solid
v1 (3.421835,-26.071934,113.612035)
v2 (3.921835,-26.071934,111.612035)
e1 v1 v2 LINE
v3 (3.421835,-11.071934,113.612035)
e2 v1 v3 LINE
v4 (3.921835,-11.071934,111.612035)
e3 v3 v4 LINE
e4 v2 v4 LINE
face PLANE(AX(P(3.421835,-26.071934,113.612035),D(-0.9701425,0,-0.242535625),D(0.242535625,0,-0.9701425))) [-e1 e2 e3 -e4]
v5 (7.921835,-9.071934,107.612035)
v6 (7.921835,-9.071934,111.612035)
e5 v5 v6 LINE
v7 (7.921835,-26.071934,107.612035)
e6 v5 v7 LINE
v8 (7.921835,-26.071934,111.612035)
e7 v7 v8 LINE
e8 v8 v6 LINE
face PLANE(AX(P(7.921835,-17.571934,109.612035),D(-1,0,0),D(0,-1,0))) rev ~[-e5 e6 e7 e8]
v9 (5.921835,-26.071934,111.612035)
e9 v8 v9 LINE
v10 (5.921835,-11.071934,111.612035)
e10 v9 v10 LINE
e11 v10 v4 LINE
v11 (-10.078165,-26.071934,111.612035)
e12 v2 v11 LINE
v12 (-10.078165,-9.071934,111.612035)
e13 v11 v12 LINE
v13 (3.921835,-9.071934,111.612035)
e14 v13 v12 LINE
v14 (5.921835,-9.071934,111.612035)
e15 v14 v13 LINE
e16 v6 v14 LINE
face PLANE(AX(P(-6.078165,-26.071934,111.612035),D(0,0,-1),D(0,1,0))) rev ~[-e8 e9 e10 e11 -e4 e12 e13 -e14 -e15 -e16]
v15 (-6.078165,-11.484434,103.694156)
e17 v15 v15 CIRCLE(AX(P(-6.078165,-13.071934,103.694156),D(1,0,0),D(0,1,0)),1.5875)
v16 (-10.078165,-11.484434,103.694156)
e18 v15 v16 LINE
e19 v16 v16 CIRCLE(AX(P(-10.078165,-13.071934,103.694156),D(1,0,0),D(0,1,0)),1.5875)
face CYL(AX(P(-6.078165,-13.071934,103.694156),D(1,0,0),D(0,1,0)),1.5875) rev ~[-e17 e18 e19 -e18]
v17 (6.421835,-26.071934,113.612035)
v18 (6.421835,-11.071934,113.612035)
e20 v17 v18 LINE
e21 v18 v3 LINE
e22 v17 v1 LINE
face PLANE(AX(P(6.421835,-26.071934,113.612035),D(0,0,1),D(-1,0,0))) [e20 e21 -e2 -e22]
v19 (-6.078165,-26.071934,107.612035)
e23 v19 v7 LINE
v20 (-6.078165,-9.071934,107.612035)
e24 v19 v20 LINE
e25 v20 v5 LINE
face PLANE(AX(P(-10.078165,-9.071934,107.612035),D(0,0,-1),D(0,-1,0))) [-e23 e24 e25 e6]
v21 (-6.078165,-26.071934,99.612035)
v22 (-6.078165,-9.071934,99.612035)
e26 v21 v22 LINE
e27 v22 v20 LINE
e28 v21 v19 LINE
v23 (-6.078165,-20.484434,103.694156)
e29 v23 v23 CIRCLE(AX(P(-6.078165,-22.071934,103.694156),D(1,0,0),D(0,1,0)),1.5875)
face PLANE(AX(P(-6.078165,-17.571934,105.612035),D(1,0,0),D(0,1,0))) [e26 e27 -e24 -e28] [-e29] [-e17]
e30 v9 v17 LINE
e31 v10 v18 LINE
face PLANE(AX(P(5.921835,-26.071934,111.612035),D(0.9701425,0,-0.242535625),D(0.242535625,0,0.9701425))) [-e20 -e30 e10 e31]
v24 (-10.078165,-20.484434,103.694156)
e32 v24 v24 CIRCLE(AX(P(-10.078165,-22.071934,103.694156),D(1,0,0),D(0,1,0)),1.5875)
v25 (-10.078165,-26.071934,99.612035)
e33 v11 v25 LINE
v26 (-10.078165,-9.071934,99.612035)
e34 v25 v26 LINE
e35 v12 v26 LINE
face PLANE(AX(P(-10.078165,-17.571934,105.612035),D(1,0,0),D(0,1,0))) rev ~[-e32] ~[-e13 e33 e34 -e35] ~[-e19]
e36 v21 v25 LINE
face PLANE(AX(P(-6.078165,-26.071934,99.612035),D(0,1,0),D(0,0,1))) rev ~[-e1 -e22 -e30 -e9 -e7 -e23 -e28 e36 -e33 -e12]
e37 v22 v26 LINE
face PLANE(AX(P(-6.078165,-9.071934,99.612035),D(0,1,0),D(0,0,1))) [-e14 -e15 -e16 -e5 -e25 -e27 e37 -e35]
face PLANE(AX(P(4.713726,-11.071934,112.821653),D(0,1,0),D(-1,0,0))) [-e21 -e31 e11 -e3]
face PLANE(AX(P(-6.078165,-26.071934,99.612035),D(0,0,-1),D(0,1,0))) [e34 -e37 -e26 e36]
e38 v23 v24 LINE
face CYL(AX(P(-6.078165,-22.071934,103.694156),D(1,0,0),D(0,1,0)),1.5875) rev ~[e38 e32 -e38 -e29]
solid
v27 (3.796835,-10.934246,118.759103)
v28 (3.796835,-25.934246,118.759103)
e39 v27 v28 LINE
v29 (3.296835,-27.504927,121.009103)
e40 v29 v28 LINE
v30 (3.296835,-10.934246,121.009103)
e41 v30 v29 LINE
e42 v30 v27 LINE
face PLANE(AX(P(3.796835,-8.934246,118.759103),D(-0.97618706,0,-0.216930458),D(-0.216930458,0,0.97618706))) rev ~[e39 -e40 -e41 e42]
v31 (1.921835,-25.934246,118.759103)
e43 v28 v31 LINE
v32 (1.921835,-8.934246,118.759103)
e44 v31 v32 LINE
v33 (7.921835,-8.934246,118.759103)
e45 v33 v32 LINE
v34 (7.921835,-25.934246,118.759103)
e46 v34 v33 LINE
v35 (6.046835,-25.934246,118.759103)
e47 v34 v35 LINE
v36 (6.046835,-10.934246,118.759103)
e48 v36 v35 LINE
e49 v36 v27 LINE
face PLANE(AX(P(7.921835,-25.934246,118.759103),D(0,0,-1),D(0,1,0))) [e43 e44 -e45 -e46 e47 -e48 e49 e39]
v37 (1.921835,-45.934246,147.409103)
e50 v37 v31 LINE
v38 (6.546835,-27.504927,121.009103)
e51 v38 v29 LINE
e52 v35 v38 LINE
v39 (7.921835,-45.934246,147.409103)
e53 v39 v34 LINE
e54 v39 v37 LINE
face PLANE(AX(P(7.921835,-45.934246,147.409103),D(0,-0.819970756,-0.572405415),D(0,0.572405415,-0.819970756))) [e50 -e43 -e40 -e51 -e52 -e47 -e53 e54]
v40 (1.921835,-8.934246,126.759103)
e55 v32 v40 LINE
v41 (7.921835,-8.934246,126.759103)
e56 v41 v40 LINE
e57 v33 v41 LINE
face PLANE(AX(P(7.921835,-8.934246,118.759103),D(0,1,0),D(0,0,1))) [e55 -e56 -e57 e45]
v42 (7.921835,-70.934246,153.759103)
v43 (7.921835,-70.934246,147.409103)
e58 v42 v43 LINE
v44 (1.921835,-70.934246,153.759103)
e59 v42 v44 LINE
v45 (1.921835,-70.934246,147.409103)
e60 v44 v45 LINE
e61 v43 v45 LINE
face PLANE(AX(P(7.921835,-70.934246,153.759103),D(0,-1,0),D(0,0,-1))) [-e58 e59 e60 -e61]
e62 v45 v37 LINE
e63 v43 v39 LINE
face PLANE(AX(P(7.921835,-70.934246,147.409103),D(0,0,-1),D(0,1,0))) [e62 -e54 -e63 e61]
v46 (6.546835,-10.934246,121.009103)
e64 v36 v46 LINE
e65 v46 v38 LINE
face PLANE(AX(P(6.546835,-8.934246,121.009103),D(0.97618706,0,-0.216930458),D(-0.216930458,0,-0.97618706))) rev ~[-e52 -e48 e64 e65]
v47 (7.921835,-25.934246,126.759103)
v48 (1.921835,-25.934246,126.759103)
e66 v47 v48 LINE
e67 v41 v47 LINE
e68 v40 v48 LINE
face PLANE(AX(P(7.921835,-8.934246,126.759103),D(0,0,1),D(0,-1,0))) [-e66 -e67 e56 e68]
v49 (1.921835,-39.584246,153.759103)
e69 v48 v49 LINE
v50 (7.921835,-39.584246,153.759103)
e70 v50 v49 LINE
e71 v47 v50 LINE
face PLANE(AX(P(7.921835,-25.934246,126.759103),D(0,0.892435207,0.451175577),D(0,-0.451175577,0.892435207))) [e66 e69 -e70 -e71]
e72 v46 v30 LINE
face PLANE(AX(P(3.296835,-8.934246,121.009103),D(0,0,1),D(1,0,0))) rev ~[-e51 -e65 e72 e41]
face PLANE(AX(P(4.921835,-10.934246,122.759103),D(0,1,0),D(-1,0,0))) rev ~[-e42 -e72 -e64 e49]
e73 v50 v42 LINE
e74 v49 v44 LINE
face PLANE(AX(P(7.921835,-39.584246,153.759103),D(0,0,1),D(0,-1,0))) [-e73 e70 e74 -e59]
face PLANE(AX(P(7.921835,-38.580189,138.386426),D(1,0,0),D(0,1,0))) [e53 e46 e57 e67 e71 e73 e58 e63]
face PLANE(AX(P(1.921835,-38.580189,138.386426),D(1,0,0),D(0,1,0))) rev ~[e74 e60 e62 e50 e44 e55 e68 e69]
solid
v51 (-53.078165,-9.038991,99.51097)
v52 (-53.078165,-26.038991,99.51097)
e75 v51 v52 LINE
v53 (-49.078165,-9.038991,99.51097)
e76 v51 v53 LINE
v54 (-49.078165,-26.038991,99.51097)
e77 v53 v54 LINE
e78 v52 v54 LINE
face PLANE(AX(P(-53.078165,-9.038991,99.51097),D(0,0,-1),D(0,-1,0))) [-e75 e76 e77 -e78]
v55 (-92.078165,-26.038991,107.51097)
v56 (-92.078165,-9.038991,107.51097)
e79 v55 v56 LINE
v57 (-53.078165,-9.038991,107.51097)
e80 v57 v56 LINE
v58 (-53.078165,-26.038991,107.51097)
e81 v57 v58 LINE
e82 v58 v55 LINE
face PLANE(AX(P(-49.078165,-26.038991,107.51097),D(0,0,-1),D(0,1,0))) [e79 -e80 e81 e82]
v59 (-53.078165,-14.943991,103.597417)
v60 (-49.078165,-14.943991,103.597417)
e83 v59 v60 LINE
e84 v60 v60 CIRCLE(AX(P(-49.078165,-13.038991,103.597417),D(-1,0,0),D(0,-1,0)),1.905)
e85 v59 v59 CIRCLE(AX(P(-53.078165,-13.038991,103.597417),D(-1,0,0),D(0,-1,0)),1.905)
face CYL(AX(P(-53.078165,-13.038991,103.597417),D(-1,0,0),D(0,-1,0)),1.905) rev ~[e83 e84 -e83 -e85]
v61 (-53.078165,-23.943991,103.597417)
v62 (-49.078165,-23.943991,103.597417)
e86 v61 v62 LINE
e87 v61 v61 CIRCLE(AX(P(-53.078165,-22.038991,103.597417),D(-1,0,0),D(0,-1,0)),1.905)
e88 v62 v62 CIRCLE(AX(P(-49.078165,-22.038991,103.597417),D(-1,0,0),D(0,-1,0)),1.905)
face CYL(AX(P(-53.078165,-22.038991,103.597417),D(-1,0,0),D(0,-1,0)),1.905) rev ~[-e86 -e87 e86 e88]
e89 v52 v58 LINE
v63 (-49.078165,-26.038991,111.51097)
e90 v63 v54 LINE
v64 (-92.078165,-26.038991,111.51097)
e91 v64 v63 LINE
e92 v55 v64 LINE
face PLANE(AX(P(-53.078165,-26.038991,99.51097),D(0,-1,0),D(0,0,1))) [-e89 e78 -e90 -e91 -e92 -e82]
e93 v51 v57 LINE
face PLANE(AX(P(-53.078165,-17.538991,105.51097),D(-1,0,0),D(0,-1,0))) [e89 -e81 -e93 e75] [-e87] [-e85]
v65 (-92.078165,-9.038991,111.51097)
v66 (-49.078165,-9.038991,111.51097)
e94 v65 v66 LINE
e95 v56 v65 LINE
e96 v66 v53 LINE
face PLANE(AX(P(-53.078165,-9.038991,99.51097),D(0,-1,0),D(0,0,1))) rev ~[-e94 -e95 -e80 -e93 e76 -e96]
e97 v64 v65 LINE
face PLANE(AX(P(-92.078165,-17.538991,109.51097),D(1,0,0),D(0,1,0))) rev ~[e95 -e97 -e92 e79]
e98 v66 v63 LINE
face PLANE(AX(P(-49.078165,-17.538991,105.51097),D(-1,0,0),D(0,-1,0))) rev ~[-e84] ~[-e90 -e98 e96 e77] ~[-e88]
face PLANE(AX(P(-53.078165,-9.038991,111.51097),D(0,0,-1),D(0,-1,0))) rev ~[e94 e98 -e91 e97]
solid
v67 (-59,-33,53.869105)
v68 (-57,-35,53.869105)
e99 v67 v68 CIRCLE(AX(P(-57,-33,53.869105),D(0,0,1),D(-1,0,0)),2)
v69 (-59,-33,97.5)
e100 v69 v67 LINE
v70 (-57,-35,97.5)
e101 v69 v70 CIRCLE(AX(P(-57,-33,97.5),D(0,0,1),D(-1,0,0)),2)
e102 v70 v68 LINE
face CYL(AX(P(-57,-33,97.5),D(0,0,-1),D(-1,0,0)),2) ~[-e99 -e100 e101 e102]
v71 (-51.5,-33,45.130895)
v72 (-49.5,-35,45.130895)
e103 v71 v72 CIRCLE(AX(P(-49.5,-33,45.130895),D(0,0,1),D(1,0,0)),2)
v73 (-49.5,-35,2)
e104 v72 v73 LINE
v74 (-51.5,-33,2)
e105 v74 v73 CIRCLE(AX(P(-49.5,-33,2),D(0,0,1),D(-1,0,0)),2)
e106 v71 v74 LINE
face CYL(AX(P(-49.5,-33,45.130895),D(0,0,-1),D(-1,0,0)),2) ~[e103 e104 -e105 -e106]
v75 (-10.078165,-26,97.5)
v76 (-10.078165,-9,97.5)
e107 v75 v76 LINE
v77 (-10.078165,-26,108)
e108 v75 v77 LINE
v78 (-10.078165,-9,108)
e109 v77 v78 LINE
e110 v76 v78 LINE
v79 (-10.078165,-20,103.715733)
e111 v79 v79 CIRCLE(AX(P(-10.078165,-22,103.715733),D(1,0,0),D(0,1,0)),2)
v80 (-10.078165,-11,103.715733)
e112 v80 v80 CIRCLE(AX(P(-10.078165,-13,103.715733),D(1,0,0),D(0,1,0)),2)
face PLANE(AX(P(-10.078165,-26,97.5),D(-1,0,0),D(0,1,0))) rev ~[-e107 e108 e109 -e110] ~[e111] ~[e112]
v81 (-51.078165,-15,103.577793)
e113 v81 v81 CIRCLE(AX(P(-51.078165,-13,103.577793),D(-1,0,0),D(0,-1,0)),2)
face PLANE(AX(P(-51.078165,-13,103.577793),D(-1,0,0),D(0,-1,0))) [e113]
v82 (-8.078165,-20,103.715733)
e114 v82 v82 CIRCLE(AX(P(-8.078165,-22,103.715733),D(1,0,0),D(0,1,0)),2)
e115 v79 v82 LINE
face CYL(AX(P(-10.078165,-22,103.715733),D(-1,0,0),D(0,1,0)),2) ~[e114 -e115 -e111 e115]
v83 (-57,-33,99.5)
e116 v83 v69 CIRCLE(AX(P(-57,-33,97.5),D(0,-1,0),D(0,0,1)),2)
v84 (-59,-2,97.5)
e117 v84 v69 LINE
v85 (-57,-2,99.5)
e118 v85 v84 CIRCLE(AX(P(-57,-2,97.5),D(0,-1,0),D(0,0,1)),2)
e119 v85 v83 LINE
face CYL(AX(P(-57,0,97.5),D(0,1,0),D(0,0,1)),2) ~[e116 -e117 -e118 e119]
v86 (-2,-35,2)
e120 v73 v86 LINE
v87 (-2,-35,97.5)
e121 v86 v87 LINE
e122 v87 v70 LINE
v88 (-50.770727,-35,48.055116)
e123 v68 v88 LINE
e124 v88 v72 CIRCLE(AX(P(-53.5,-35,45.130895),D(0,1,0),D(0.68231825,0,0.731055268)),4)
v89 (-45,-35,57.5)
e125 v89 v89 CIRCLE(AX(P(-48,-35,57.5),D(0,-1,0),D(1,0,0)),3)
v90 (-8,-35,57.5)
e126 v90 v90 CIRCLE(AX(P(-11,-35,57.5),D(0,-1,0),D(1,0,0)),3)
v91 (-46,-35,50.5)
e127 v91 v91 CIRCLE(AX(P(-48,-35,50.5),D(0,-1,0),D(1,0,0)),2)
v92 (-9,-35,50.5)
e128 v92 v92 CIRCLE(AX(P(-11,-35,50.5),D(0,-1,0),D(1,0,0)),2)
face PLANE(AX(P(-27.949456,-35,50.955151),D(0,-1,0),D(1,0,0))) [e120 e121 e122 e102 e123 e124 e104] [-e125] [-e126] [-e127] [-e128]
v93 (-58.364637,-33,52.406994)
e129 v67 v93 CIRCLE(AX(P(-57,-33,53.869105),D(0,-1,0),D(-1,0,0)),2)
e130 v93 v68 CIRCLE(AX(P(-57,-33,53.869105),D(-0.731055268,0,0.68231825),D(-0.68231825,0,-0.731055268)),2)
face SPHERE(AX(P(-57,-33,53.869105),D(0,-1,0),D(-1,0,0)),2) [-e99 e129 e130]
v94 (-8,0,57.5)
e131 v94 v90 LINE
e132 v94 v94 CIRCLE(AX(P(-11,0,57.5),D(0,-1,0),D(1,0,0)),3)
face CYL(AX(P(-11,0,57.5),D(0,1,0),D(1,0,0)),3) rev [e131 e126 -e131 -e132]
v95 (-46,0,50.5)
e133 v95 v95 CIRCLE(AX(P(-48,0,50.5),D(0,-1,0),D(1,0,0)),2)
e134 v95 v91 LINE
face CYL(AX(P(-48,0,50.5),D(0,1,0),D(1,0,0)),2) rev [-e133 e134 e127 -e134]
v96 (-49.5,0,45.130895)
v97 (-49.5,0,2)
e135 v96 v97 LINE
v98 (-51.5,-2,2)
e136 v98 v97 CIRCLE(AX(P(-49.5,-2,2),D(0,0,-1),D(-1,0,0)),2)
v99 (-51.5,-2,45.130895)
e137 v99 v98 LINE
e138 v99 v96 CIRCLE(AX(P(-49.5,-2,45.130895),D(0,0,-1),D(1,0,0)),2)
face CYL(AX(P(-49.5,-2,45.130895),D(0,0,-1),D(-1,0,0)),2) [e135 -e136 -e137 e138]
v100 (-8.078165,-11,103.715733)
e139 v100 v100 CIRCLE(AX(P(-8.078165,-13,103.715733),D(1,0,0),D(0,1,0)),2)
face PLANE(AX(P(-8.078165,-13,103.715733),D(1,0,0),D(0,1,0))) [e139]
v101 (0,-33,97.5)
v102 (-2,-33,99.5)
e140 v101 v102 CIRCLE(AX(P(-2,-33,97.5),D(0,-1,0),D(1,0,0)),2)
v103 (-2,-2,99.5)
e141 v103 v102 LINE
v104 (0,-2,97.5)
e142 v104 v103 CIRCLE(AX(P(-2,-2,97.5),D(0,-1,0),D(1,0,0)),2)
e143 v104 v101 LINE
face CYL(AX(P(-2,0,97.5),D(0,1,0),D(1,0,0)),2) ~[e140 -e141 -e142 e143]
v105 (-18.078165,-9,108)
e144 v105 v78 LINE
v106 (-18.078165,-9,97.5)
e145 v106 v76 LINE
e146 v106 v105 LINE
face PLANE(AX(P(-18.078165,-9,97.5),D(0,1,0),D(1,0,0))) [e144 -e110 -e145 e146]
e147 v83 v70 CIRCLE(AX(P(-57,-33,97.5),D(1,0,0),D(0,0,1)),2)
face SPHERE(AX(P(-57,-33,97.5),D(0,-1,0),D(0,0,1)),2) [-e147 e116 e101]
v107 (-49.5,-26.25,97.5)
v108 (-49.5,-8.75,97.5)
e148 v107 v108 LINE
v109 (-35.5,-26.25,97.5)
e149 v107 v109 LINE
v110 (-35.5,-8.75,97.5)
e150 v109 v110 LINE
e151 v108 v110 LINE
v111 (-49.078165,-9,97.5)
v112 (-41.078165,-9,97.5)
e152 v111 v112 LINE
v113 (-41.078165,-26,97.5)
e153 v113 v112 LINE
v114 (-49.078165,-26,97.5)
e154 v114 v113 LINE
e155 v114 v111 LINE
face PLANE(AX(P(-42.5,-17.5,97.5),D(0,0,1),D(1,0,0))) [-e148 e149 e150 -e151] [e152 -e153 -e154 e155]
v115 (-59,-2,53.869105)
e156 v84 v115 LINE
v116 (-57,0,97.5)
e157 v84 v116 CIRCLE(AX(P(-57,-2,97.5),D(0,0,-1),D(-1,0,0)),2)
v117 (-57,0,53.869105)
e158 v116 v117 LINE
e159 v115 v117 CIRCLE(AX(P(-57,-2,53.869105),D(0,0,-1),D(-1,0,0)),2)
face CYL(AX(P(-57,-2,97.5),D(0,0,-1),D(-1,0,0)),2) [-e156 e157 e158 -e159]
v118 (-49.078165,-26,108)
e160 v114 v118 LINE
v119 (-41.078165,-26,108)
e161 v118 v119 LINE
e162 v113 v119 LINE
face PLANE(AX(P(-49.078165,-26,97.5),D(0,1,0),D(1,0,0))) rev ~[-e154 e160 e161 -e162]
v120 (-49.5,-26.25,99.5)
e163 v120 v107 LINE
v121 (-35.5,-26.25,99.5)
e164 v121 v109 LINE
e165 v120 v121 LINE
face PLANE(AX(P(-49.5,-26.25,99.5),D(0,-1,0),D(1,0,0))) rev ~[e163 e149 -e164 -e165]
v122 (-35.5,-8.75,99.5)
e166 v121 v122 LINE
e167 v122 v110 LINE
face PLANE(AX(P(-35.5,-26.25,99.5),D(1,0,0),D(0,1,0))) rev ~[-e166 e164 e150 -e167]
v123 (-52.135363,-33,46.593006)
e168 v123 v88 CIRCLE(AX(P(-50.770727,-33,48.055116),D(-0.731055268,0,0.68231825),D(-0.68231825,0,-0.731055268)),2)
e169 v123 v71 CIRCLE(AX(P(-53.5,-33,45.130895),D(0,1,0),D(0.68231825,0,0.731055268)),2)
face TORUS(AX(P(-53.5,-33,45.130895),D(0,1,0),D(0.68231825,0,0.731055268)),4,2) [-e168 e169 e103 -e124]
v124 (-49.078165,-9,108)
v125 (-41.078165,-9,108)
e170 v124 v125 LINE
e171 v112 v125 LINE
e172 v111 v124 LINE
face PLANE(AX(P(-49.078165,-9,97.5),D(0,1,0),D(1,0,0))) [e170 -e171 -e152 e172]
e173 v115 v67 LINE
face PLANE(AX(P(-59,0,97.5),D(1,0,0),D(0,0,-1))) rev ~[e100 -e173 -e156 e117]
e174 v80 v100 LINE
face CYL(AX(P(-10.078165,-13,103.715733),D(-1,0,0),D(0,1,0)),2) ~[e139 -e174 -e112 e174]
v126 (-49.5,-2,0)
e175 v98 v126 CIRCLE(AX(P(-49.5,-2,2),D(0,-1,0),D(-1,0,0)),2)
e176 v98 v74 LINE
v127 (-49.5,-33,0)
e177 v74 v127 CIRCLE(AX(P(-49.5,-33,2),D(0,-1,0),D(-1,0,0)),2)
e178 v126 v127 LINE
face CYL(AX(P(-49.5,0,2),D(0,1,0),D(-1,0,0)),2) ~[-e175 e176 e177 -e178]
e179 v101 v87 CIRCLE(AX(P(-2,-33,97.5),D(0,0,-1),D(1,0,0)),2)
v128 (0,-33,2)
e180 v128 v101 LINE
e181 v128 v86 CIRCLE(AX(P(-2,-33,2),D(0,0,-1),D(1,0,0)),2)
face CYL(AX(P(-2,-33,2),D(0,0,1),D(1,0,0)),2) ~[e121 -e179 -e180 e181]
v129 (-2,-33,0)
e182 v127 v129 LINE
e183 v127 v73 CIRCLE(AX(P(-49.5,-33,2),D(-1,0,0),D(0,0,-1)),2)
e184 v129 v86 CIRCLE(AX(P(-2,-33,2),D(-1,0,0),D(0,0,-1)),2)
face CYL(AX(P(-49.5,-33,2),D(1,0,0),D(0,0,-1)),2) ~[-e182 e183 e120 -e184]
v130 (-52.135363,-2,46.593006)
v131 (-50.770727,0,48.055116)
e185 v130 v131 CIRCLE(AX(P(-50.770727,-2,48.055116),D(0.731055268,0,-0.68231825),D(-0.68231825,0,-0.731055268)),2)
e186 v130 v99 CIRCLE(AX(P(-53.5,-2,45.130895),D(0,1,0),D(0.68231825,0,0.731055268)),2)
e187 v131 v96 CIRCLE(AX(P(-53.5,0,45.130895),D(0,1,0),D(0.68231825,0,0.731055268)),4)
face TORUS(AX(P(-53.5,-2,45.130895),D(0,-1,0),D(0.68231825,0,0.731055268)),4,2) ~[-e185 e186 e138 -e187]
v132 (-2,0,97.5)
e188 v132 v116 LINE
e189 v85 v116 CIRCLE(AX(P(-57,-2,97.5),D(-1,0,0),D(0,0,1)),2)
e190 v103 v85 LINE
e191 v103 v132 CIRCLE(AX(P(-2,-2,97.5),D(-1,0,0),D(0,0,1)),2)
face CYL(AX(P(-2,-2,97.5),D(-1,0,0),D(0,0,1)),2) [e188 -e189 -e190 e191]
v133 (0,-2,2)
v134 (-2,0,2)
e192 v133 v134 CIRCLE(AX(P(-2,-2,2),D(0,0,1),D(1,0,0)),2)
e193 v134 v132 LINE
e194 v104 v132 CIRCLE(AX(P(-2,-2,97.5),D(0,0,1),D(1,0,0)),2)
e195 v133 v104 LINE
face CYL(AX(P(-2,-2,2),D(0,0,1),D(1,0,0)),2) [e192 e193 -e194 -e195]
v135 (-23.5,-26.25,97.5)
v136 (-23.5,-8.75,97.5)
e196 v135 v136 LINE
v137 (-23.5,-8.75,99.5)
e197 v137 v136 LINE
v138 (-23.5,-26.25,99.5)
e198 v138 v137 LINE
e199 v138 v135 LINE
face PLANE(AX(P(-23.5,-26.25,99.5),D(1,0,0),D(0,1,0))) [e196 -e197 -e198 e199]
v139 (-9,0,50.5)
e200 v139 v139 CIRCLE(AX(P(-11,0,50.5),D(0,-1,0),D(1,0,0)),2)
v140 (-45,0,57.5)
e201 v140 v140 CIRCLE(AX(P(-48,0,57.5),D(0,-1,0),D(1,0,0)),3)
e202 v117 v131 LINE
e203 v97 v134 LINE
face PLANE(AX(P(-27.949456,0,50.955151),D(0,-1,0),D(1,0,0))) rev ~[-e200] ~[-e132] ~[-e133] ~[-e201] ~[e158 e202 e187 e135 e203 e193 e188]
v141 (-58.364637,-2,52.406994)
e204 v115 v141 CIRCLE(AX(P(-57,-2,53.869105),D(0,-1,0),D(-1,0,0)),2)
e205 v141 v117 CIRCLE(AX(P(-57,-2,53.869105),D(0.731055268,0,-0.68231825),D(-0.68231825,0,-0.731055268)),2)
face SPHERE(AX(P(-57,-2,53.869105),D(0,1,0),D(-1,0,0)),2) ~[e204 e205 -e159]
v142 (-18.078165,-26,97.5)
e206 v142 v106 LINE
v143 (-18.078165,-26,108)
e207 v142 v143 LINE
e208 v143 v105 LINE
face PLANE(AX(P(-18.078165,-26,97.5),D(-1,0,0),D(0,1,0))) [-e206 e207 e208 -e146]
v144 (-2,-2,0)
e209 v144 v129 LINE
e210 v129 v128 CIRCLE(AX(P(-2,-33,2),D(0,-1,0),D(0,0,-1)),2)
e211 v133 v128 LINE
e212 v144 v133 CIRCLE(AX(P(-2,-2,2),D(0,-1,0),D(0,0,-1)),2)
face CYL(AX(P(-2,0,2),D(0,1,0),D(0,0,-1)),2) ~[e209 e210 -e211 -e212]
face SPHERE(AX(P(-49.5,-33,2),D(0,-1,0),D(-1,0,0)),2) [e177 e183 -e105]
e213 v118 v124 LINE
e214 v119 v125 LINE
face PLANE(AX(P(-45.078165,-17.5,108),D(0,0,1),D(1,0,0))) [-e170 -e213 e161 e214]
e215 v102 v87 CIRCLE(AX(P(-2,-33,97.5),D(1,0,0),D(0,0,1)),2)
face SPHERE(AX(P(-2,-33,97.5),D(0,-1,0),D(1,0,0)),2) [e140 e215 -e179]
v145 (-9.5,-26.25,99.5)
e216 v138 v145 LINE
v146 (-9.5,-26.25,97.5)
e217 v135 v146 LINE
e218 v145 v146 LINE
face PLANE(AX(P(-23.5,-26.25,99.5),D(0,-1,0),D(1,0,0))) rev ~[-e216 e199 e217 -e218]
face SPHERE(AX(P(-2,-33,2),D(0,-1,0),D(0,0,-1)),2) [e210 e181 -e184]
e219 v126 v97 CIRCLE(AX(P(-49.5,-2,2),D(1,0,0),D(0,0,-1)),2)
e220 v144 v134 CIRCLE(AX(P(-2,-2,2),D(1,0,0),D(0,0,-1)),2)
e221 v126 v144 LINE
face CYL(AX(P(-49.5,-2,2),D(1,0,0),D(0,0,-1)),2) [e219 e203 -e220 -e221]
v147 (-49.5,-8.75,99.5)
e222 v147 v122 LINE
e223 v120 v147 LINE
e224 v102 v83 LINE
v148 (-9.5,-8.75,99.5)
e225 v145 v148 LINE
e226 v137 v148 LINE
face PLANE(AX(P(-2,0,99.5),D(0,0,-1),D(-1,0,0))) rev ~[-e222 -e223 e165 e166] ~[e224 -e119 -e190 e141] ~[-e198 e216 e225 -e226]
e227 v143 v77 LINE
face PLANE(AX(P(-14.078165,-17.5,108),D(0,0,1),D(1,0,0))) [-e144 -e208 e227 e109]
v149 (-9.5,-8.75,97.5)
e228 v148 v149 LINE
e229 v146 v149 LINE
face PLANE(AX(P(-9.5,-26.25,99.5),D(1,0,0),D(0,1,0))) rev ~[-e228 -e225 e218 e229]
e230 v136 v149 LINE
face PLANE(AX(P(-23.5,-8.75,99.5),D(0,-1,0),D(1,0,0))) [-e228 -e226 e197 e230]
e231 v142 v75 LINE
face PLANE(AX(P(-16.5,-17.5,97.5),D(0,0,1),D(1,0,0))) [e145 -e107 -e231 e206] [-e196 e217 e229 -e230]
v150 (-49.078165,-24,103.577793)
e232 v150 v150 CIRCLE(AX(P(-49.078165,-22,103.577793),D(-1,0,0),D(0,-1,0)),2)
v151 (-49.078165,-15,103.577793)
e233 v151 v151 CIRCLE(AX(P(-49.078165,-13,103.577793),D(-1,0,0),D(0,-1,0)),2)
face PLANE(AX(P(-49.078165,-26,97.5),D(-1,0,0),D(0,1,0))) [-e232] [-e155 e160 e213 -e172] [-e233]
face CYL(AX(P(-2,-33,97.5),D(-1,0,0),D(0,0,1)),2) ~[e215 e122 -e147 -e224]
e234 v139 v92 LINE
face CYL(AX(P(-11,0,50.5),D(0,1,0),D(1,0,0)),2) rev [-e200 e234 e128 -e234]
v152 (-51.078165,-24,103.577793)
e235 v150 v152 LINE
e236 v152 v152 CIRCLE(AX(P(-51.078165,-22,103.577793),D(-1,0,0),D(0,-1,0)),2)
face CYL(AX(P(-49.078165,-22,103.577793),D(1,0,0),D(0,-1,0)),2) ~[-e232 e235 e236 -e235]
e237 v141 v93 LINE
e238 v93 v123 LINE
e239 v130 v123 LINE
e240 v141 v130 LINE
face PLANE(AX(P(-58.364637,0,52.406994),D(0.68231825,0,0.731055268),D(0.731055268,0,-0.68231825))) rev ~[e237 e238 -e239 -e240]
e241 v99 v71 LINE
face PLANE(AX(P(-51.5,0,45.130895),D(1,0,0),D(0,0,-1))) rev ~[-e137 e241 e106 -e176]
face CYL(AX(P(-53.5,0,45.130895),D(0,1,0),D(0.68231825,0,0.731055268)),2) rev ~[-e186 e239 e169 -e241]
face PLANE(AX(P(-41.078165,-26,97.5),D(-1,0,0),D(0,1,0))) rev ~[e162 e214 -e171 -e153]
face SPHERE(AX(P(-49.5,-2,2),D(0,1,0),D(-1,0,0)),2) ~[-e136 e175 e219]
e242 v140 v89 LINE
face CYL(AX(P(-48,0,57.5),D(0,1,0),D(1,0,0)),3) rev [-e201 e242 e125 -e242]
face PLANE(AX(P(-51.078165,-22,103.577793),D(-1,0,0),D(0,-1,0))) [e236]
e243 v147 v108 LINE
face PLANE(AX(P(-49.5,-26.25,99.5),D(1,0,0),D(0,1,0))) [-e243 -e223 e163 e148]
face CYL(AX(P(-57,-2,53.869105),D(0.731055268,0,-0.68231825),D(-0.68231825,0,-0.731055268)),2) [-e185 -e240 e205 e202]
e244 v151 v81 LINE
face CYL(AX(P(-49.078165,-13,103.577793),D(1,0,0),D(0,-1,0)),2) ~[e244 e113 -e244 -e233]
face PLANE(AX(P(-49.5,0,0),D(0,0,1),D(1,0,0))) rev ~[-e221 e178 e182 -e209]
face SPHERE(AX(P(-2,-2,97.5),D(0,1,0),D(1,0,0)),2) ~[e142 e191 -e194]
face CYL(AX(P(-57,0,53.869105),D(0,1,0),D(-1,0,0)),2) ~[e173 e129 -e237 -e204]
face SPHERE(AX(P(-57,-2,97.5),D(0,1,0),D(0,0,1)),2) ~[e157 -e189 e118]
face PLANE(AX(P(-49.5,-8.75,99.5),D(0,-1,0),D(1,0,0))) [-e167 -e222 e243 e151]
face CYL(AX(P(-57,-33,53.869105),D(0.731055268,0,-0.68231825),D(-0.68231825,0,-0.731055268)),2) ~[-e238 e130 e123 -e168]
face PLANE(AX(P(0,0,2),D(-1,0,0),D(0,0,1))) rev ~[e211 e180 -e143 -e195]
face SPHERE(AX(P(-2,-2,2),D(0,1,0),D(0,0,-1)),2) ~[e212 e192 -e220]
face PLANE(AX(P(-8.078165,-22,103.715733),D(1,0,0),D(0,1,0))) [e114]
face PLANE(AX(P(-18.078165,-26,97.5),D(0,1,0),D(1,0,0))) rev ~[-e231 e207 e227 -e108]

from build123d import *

# Parameters (mm, degrees)
F0_R      = 2
F0_R_2    = 3
F1_DEPTH  = 35
F2_R      = 2
F3_W      = 14
F3_H      = 17.5
F4_DEPTH  = 2
F5_W      = 8
F5_H      = 17
F6_DEPTH  = 10.5
F7_R      = 2
F8_DEPTH  = 2
F9_R      = 2
F10_DEPTH = 2
F12_W     = 17
F12_H     = 12
F12_R     = 1.5875
F13_DEPTH = 4
F14_W     = 17
F14_H     = 4
F15_DEPTH = 18
F17_W     = 17
F17_H     = 12
F17_R     = 1.905
F18_DEPTH = 4
F19_W     = 17
F19_H     = 4
F20_DEPTH = 43
F22_DEPTH = 17
F25_DEPTH = 6
F27_DEPTH = 62.001
F28_W     = 6
F28_H     = 8
F29_DEPTH = 2
F30_W     = 6.4162167525
F30_H     = 2.4192359447
F31_DEPTH = 2


with BuildPart() as f1:
    # F0 (on Front) → F1 (new body)
    with BuildSketch(Plane.XZ):
        with BuildLine():
            ThreePointArc((-2, 0), (-0.5857864376, 0.5857864376), (0, 2))
            Line((0, 2), (0, 97.5))
            ThreePointArc((0, 97.5), (-0.5857864376, 98.9142135624), (-2, 99.5))
            Line((-2, 99.5), (-57, 99.5))
            ThreePointArc((-57, 99.5), (-58.4142135624, 98.9142135624), (-59, 97.5))
            Line((-59, 97.5), (-59, 53.8691046038))
            ThreePointArc((-59, 53.8691046038), (-58.8342945512, 53.0720076842), (-58.3646365007, 52.4069940673))
            Line((-58.3646365007, 52.4069940673), (-52.1353634993, 46.5930059327))
            ThreePointArc((-52.1353634993, 46.5930059327), (-51.6657054488, 45.9279923158), (-51.5, 45.1308953962))
            Line((-51.5, 45.1308953962), (-51.5, 2))
            ThreePointArc((-51.5, 2), (-50.9142135624, 0.5857864376), (-49.5, 0))
            Line((-49.5, 0), (-2, 0))
        make_face()
        with Locations((-48, 50.5)):
            Circle(F0_R, mode=Mode.SUBTRACT)
        with Locations((-48, 57.5)):
            Circle(F0_R_2, mode=Mode.SUBTRACT)
        with Locations((-11, 50.5)):
            Circle(F0_R, mode=Mode.SUBTRACT)
        with Locations((-11, 57.5)):
            Circle(F0_R_2, mode=Mode.SUBTRACT)
    extrude(amount=F1_DEPTH)

    # F2
    f2_edges = [f1.edges().sort_by_distance(p)[0] for p in [
        (0, 0, 49.75),
        (-29.5, -35, 99.5),
        (-51.665705, 0, 45.927992),
        (-51.665705, -35, 45.927992),
        (-51.5, 0, 23.565448),
        (-51.5, -35, 23.565448),
        (-50.914214, 0, 0.585786),
        (-50.914214, -35, 0.585786),
        (-25.75, 0, 0),
        (-25.75, -35, 0),
        (-0.585786, 0, 0.585786),
        (-0.585786, -35, 0.585786),
        (0, -35, 49.75),
        (-0.585786, 0, 98.914214),
        (-0.585786, -35, 98.914214),
        (-29.5, 0, 99.5),
        (-58.414214, 0, 98.914214),
        (-58.414214, -35, 98.914214),
        (-59, 0, 75.684552),
        (-59, -35, 75.684552),
        (-58.834295, 0, 53.072008),
        (-58.834295, -35, 53.072008),
        (-55.25, 0, 49.5),
        (-55.25, -35, 49.5),
    ]]
    fillet(f2_edges, radius=F2_R)

    # F3 (on face) → F4 (cut)
    with BuildSketch(Plane.XY.offset(99.5)):
        with Locations((-42.5, -17.5)):
            Rectangle(F3_W, F3_H)
        with Locations((-16.5, -17.5)):
            Rectangle(F3_W, F3_H)
    extrude(amount=-F4_DEPTH, mode=Mode.SUBTRACT)

    # F5 (on face) → F6 (join)
    with BuildSketch(Plane.XY.offset(97.5)):
        with Locations((-45.0781651735, -17.5)):
            Rectangle(F5_W, F5_H)
        with Locations((-14.0781651735, -17.5)):
            Rectangle(F5_W, F5_H)
    extrude(amount=F6_DEPTH)

    # F7 (on face) → F8 (join)
    with BuildSketch(Plane(origin=(-49.0781651735, 0, 0), x_dir=(0, -1, 0), z_dir=(-1, 0, 0))):
        with Locations((13, 103.5777926445)):
            Circle(F7_R)
        with Locations((22, 103.5777926445)):
            Circle(F7_R)
    extrude(amount=F8_DEPTH)

    # F9 (on face) → F10 (join)
    with BuildSketch(Plane.YZ.offset(-10.0781651735)):
        with Locations((-22, 103.7157326937)):
            Circle(F9_R)
        with Locations((-13, 103.7157326937)):
            Circle(F9_R)
    extrude(amount=F10_DEPTH)


with BuildPart() as f13:
    # F12 (on offset) → F13 (new body)
    with BuildSketch(Plane.YZ.offset(-6.0781651735)):
        with Locations((-17.5719340369, 105.6120348573)):
            Rectangle(F12_W, F12_H)
        with Locations((-22.0719340369, 103.6941558123)):
            Circle(F12_R, mode=Mode.SUBTRACT)
        with Locations((-13.0719340369, 103.6941558123)):
            Circle(F12_R, mode=Mode.SUBTRACT)
    extrude(amount=-F13_DEPTH)

    # F14 (on face) → F15 (join)
    with BuildSketch(Plane(origin=(-10.0781651735, 0, 0), x_dir=(0, -1, 0), z_dir=(-1, 0, 0))):
        with Locations((17.5719340369, 109.6120348573)):
            Rectangle(F14_W, F14_H)
    extrude(amount=-F15_DEPTH)

    # F21 (on face) → F22 (join, through all)
    with BuildSketch(Plane.XZ.offset(26.0719340369)):
        Polygon((3.4218348265, 113.6120348573), (3.9218348265, 111.6120348573), (5.9218348265, 111.6120348573), (6.4218348265, 113.6120348573), align=None)
    extrude(amount=-F22_DEPTH)

    # F30 (on face) → F31 (cut)
    with BuildSketch(Plane(origin=(0, -9.0719340369, 0), x_dir=(-1, 0, 0), z_dir=(0, 1, 0))):
        with Locations((-4.7137264502, 112.8216528296)):
            Rectangle(F30_W, F30_H)
    extrude(amount=-F31_DEPTH, mode=Mode.SUBTRACT)


with BuildPart() as f18:
    # F17 (on offset) → F18 (new body)
    with BuildSketch(Plane(origin=(-53.0781651735, 0, 0), x_dir=(0, -1, 0), z_dir=(-1, 0, 0))):
        with Locations((17.5389906317, 105.5109703541)):
            Rectangle(F17_W, F17_H)
        with Locations((13.0389906317, 103.5974174738)):
            Circle(F17_R, mode=Mode.SUBTRACT)
        with Locations((22.0389906317, 103.5974174738)):
            Circle(F17_R, mode=Mode.SUBTRACT)
    extrude(amount=-F18_DEPTH)

    # F19 (on face) → F20 (join)
    with BuildSketch(Plane.YZ.offset(-49.0781651735)):
        with Locations((-17.5389906317, 109.5109703541)):
            Rectangle(F19_W, F19_H)
    extrude(amount=-F20_DEPTH)


with BuildPart() as f25:
    # F24 (on offset) → F25 (new body)
    with BuildSketch(Plane.YZ.offset(7.9218348265)):
        Polygon((-45.9342463762, 147.4091031194), (-25.9342463762, 118.7591031194), (-8.9342463762, 118.7591031194), (-8.9342463762, 126.7591031194), (-25.9342463762, 126.7591031194), (-39.5842463762, 153.7591031194), (-70.9342463762, 153.7591031194), (-70.9342463762, 147.4091031194), align=None)
    extrude(amount=-F25_DEPTH)

    # F26 (on face) → F27 (cut, through all)
    with BuildSketch(Plane(origin=(0, -8.9342463762, 0), x_dir=(-1, 0, 0), z_dir=(0, 1, 0))):
        Polygon((-6.5468348265, 121.0091031194), (-6.0468348265, 118.7591031194), (-3.7968348265, 118.7591031194), (-3.2968348265, 121.0091031194), align=None)
    extrude(amount=-F27_DEPTH, mode=Mode.SUBTRACT)

    # F28 (on face) → F29 (join)
    with BuildSketch(Plane(origin=(0, -8.9342463762, 0), x_dir=(-1, 0, 0), z_dir=(0, 1, 0))):
        with Locations((-4.9218348265, 122.7591031194)):
            Rectangle(F28_W, F28_H)
    extrude(amount=-F29_DEPTH)


solid = Compound([f1.part, f13.part, f18.part, f25.part])
